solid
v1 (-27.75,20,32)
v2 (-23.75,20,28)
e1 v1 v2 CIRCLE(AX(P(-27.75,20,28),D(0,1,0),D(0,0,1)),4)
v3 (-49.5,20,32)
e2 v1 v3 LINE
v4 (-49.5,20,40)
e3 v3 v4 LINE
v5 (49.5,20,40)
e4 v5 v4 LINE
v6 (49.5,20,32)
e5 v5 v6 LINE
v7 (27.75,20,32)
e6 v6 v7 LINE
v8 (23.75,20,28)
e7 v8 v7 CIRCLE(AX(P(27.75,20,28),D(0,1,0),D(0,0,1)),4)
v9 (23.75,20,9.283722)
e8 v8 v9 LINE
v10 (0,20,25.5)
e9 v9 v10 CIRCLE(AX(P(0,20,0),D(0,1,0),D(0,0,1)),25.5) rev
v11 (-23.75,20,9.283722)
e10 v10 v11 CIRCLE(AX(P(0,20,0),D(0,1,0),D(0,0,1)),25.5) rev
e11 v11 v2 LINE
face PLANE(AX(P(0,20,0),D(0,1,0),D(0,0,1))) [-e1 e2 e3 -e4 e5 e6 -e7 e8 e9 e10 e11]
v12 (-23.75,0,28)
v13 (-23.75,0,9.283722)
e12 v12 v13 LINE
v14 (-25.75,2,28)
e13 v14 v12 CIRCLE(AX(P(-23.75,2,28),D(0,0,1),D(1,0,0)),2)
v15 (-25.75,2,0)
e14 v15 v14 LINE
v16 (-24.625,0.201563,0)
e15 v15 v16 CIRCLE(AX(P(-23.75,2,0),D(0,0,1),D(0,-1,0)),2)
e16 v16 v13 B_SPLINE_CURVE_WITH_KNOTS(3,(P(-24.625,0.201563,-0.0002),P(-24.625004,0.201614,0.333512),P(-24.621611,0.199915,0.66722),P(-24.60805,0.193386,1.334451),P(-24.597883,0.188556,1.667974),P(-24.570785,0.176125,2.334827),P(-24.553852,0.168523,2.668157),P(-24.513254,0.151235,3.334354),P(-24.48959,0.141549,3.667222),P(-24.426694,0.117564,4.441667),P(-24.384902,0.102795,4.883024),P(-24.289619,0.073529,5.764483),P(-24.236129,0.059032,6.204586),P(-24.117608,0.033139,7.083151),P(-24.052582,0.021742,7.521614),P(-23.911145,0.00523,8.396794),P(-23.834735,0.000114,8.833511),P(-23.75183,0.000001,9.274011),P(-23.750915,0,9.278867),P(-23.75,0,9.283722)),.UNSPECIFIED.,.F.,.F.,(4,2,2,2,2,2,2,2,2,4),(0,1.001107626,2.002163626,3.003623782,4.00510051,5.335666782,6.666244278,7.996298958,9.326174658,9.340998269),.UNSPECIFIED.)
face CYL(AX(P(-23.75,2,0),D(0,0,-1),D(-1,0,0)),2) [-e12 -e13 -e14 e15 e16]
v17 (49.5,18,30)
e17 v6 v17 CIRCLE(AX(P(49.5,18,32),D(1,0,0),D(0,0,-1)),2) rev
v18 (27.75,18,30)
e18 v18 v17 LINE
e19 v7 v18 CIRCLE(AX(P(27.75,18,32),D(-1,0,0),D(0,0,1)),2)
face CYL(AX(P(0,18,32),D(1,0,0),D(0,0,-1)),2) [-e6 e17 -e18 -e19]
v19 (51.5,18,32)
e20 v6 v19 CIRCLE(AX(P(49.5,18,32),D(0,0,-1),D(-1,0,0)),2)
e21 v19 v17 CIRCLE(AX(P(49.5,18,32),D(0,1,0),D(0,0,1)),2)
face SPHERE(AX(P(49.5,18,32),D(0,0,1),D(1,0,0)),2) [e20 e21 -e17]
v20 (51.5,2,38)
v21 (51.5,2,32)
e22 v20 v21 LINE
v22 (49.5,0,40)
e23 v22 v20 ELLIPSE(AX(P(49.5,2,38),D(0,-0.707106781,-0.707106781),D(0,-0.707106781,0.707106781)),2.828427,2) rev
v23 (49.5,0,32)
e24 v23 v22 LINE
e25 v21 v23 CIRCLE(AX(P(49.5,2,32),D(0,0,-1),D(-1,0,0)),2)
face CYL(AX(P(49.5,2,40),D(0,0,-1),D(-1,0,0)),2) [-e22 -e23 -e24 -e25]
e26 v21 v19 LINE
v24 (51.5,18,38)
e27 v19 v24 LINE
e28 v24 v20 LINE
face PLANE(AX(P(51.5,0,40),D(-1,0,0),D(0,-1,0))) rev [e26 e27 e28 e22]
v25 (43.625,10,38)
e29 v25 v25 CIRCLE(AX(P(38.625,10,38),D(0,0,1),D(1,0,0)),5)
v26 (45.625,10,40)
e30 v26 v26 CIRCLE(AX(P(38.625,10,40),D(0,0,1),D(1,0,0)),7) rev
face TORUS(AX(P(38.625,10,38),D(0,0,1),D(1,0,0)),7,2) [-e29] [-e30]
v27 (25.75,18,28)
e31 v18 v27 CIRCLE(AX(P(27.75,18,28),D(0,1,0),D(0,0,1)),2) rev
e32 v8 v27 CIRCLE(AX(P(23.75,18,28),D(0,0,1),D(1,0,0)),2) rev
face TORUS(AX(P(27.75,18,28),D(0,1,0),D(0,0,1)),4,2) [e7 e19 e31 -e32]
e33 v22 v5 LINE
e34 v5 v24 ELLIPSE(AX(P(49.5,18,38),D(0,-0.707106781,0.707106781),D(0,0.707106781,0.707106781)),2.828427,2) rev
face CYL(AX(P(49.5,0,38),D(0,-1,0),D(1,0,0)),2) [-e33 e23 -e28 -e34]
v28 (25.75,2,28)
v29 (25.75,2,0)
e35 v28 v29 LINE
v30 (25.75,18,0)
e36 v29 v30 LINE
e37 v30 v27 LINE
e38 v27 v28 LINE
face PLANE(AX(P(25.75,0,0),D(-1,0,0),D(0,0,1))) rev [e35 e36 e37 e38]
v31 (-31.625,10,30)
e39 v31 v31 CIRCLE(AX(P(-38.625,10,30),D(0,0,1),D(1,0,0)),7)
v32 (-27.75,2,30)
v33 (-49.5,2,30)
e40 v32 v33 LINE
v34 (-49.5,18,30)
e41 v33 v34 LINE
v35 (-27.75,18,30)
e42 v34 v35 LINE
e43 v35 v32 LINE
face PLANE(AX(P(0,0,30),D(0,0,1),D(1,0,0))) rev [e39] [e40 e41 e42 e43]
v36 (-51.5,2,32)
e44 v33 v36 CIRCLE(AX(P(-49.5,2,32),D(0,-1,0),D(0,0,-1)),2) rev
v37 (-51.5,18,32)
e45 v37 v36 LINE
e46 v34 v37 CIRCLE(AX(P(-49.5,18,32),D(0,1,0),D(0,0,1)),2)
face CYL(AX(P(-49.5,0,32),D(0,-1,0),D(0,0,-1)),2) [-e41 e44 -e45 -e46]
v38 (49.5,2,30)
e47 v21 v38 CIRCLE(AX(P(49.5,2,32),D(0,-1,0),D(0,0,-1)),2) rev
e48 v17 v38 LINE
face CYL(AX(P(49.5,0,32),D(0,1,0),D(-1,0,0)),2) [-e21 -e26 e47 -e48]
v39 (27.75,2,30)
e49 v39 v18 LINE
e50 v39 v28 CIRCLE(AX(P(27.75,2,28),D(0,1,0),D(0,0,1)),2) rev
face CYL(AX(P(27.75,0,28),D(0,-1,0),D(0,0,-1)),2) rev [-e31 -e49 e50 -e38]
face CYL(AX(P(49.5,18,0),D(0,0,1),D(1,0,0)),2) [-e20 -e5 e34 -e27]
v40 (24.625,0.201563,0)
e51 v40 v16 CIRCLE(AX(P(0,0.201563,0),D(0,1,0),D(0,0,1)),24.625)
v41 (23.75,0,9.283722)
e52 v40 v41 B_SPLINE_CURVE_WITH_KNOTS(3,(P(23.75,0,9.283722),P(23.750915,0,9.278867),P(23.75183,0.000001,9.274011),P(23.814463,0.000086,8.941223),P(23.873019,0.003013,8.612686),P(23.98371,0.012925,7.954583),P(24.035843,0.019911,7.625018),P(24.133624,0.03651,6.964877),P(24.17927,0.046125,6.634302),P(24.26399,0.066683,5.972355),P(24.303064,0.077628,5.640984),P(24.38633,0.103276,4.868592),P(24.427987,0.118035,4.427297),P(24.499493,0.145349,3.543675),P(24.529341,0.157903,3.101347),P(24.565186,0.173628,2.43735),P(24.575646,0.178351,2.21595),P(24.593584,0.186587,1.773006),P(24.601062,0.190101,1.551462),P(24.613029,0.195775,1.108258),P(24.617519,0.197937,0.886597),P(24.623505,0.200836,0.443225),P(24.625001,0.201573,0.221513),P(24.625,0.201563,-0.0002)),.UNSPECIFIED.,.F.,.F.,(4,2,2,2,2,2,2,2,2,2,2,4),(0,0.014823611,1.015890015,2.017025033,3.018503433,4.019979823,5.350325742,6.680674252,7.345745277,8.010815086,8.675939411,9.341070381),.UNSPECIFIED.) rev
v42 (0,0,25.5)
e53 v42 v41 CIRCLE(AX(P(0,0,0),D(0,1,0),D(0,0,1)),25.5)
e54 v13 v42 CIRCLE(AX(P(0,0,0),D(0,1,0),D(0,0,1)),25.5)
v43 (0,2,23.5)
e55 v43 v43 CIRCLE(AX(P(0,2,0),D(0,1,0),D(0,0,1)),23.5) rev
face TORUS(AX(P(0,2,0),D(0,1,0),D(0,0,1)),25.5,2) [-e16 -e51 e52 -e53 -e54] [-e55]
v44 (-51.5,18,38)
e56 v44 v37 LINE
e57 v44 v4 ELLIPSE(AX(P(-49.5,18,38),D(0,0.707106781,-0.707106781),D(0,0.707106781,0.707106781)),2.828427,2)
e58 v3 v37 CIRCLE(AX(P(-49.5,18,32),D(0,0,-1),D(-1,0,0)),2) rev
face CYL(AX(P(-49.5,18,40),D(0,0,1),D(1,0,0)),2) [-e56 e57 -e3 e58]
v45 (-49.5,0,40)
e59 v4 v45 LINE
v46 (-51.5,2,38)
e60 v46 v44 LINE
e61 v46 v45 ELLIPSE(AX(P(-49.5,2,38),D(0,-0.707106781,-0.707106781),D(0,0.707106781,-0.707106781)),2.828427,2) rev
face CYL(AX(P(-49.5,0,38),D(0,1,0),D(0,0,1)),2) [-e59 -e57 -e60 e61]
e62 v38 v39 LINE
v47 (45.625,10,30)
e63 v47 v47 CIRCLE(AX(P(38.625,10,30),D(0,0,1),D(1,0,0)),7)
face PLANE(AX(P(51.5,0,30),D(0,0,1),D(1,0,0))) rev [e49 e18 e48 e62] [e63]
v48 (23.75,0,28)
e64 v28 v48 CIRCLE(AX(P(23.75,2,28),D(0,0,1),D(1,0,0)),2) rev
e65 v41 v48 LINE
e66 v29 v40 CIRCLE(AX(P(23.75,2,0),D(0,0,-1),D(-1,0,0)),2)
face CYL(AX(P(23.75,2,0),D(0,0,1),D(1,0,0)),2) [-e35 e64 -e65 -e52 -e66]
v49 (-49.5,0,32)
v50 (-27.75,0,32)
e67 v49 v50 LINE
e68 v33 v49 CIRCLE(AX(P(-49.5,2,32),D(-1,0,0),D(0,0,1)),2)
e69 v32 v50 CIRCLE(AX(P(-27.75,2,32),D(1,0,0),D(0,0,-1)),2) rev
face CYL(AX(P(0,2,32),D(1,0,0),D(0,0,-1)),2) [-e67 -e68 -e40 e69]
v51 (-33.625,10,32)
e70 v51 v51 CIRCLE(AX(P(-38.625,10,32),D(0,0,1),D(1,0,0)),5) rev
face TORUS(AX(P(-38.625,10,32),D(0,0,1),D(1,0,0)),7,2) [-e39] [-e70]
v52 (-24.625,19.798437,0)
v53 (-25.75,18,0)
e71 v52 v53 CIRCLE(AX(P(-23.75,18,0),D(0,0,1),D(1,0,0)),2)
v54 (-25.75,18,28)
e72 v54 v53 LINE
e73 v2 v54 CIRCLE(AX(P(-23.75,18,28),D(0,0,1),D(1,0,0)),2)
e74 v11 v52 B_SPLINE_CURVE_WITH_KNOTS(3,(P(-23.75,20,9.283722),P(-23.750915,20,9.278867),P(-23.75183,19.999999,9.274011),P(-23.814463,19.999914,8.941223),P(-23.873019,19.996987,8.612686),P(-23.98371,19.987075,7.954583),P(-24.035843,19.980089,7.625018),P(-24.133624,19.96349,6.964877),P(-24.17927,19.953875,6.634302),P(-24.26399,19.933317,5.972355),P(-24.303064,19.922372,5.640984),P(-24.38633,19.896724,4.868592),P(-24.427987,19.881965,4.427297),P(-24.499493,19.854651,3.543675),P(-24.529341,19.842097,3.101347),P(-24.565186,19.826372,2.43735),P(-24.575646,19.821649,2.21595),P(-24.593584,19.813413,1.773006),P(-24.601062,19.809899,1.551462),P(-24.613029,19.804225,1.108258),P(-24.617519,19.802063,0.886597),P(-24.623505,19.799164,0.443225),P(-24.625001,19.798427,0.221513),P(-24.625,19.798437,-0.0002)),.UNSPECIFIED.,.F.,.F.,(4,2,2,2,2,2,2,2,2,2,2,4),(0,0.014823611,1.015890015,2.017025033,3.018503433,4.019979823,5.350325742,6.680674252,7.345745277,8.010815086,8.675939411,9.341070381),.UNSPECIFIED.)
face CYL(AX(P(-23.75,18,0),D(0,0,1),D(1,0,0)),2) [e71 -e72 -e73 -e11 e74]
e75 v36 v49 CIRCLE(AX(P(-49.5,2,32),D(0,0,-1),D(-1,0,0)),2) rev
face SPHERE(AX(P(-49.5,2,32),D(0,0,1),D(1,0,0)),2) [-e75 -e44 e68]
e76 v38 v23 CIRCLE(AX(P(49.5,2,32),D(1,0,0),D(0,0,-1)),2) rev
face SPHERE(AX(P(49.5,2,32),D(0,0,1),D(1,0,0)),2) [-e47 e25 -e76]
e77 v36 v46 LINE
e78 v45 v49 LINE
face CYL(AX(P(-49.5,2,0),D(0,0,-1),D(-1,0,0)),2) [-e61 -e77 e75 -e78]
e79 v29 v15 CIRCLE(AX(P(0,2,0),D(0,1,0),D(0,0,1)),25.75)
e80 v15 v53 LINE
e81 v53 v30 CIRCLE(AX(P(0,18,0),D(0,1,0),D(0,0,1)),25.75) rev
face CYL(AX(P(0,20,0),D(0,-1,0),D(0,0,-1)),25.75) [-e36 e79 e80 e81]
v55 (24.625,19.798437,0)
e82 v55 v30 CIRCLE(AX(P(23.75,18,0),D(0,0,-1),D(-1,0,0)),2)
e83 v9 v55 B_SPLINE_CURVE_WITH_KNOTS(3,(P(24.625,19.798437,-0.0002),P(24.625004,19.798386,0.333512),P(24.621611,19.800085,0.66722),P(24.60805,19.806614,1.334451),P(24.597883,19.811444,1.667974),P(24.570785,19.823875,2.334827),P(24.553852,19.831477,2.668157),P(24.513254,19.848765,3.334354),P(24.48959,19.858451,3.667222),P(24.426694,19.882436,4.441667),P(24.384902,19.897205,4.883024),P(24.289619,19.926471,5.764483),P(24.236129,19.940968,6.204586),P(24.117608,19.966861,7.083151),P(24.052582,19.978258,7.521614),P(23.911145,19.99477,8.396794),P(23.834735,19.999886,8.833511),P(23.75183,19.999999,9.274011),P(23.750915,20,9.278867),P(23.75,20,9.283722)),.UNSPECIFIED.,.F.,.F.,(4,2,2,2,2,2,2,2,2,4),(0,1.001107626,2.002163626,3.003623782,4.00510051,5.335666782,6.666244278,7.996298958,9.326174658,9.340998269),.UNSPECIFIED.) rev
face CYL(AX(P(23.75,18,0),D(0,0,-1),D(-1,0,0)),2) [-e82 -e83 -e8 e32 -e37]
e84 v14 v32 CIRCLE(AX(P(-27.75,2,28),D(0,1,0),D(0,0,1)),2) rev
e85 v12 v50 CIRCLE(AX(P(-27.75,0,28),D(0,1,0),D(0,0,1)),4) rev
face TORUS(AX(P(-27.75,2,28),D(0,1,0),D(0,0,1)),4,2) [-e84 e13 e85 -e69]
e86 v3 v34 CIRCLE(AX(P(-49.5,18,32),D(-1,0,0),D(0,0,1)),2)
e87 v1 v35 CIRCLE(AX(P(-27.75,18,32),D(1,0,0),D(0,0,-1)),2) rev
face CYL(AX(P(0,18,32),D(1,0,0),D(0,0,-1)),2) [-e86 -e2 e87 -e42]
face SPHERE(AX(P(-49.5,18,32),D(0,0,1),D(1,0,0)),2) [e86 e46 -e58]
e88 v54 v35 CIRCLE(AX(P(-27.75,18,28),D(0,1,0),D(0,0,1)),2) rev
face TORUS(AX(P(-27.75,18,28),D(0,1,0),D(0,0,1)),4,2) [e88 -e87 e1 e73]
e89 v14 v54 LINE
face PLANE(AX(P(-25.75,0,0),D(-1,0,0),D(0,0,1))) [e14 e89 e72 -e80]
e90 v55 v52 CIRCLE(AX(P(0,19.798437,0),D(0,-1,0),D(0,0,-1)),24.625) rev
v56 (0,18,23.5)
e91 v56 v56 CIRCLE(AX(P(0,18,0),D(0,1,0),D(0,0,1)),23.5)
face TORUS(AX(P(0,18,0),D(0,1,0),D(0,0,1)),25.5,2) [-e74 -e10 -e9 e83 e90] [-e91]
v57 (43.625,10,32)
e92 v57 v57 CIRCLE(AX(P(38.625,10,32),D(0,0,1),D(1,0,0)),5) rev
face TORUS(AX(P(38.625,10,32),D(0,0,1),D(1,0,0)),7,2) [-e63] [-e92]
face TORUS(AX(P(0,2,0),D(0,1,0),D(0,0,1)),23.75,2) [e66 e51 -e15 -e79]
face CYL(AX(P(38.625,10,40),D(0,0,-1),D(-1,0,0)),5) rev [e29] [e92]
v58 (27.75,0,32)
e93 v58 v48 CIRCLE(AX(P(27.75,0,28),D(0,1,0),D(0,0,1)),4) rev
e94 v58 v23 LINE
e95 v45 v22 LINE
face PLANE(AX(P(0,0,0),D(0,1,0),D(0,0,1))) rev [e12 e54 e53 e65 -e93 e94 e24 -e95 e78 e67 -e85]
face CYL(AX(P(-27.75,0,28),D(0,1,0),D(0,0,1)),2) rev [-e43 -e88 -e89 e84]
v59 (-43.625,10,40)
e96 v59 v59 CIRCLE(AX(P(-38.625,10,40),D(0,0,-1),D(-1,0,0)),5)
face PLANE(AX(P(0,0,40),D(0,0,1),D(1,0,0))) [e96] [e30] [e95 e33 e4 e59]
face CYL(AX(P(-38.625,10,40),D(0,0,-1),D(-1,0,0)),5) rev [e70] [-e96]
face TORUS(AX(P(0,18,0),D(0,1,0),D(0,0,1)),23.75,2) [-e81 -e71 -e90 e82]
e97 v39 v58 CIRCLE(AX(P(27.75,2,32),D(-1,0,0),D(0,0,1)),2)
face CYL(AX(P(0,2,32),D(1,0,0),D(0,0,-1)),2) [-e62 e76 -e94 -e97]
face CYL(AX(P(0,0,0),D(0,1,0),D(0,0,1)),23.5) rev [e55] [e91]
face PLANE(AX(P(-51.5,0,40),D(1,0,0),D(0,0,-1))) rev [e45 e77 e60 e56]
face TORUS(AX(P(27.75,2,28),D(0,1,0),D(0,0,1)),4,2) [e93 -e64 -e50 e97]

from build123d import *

# Parameters (mm, degrees)
SKETCH1_R           = 25.75
BOSS_EXTRUDE1_DEPTH = 20
SKETCH3_W           = 51.5
SKETCH3_H           = 30
BOSS_EXTRUDE2_DEPTH = 20
SKETCH2_R           = 23.5
CUT_EXTRUDE1_DEPTH  = 20
SKETCH6_W           = 51.5
SKETCH6_H           = 20
BOSS_EXTRUDE3_DEPTH = 10
LPATTERN1_COUNT     = 2
LPATTERN1_PITCH     = 51.5
SKETCH7_R           = 5
CUT_EXTRUDE2_DEPTH  = 10
LPATTERN2_COUNT     = 2
LPATTERN2_PITCH     = 77.25
FILLET3_R           = 2


with BuildPart() as part:
    # Sketch1 → Boss-Extrude1 (new body)
    with BuildSketch(Plane(origin=(0, 0, 0), x_dir=(1, 0, 0), z_dir=(0, 1, 0))):
        with Locations(Location((0, 0, 0), (0, 0, 270))):
            Circle(SKETCH1_R)
    extrude(amount=BOSS_EXTRUDE1_DEPTH)

    # Sketch3 → Boss-Extrude2 (add)
    with BuildSketch(Plane(origin=(0, 20, 0), x_dir=(1, 0, 0), z_dir=(0, 1, 0))):
        with Locations((0, -15)):
            Rectangle(SKETCH3_W, SKETCH3_H)
    extrude(amount=-BOSS_EXTRUDE2_DEPTH)

    # Sketch2 → Cut-Extrude1 (cut)
    with BuildSketch(Plane(origin=(0, 20, 0), x_dir=(1, 0, 0), z_dir=(0, 1, 0))):
        with Locations(Location((0, 0, 0), (0, 0, 270))):
            Circle(SKETCH2_R)
    extrude(amount=-CUT_EXTRUDE1_DEPTH, mode=Mode.SUBTRACT)

    # Sketch6 → Boss-Extrude3 (add)
    with BuildSketch(Plane.XY.offset(30)):
        with Locations((-25.75, 10)):
            Rectangle(SKETCH6_W, SKETCH6_H)
    boss_extrude3 = extrude(amount=BOSS_EXTRUDE3_DEPTH)

    # LPattern1: Boss-Extrude3 ×2
    with Locations(*[(i * LPATTERN1_PITCH, 0, 0) for i in range(1, LPATTERN1_COUNT)]):
        add(boss_extrude3)

    # Sketch7 → Cut-Extrude2 (cut)
    with BuildSketch(Plane(origin=(0, 0, 30), x_dir=(-1, 0, 0), z_dir=(0, 0, -1))):
        with Locations((-38.625, 10)):
            Circle(SKETCH7_R)
    cut_extrude2 = extrude(amount=-CUT_EXTRUDE2_DEPTH, mode=Mode.SUBTRACT)

    # LPattern2: Cut-Extrude2 ×2
    with Locations(*[(-i * LPATTERN2_PITCH, 0, 0) for i in range(1, LPATTERN2_COUNT)]):
        add(cut_extrude2, mode=Mode.SUBTRACT)

    # Fillet3
    # the kernel refuses this fillet: 2 mm, written as the material it adds along each edge
    with BuildSketch(Plane(origin=(25.75, 20, 30), x_dir=(1, 0, 0), z_dir=(0, -1, 0)), Plane(origin=(-25.75, 20, 30), x_dir=(0, 0, -1), z_dir=(0, -1, 0))) as fillet3_piece_1:
        with BuildLine():
            CenterArc((FILLET3_R, -FILLET3_R), FILLET3_R, 90, 90)
            Line((0, -FILLET3_R), (0, 0))
            Line((0, 0), (FILLET3_R, 0))
        make_face()
    extrude(amount=20)
    # the kernel refuses this fillet: 2 mm, written as the material it takes off along each edge
    with BuildSketch(Plane(origin=(0, 0, 0), x_dir=(0, 0, 1), z_dir=(-1, 0, 0))) as fillet3_2_piece_1:
        with BuildLine():
            CenterArc((23.5 + FILLET3_R, FILLET3_R), FILLET3_R, 180, 90)
            Line((23.5, FILLET3_R), (23.5, 0))
            Line((23.5, 0), (23.5 + FILLET3_R, 0))
        make_face()
    revolve(axis=Axis((0, 0, 0), (0, 1, 0)), mode=Mode.SUBTRACT)
    with BuildSketch(Plane(origin=(0, 20, 0), x_dir=(0, 0, 1), z_dir=(-1, 0, 0))) as fillet3_2_piece_2:
        with BuildLine():
            CenterArc((23.5 + FILLET3_R, -FILLET3_R), FILLET3_R, 90, 90)
            Line((23.5 + FILLET3_R, 0), (23.5, 0))
            Line((23.5, 0), (23.5, -FILLET3_R))
        make_face()
    revolve(axis=Axis((0, 20, 0), (0, 1, 0)), mode=Mode.SUBTRACT)
    with BuildSketch(Plane(origin=(-51.5, -5, 30), x_dir=(1, 0, 0), z_dir=(0, 1, 0)), Plane(origin=(-51.5, -5, 40), x_dir=(0, 0, -1), z_dir=(0, 1, 0))) as fillet3_2_piece_3:
        with BuildLine():
            CenterArc((FILLET3_R, -FILLET3_R), FILLET3_R, 90, 90)
            Line((0, -FILLET3_R), (0, 0))
            Line((0, 0), (FILLET3_R, 0))
        make_face()
    extrude(amount=30, mode=Mode.SUBTRACT)
    with BuildSketch(Plane(origin=(-51.5, 20, 25), x_dir=(0, -1, 0), z_dir=(0, 0, 1)), Plane(origin=(-51.5, 0, 25), x_dir=(1, 0, 0), z_dir=(0, 0, 1))) as fillet3_2_piece_4:
        with BuildLine():
            CenterArc((FILLET3_R, FILLET3_R), FILLET3_R, 180, 90)
            Line((0, FILLET3_R), (0, 0))
            Line((0, 0), (FILLET3_R, 0))
        make_face()
    extrude(amount=20, mode=Mode.SUBTRACT)
    with BuildSketch(Plane(origin=(51.5, 25, 30), x_dir=(0, 0, 1), z_dir=(0, -1, 0)), Plane(origin=(51.5, 25, 40), x_dir=(-1, 0, 0), z_dir=(0, -1, 0))) as fillet3_2_piece_5:
        with BuildLine():
            CenterArc((FILLET3_R, FILLET3_R), FILLET3_R, 180, 90)
            Line((0, FILLET3_R), (0, 0))
            Line((0, 0), (FILLET3_R, 0))
        make_face()
    extrude(amount=30, mode=Mode.SUBTRACT)
    with BuildSketch(Plane(origin=(51.5, 0, 25), x_dir=(-1, 0, 0), z_dir=(0, 0, 1)), Plane(origin=(51.5, 20, 25), x_dir=(0, -1, 0), z_dir=(0, 0, 1))) as fillet3_2_piece_6:
        with BuildLine():
            CenterArc((FILLET3_R, -FILLET3_R), FILLET3_R, 90, 90)
            Line((0, -FILLET3_R), (0, 0))
            Line((0, 0), (FILLET3_R, 0))
        make_face()
    extrude(amount=20, mode=Mode.SUBTRACT)
    with BuildSketch(Plane(origin=(38.625, 10, 40), x_dir=(-1, 0, 0), z_dir=(0, -1, 0))) as fillet3_2_piece_7:
        with BuildLine():
            CenterArc((5 + FILLET3_R, FILLET3_R), FILLET3_R, 180, 90)
            Line((5, FILLET3_R), (5, 0))
            Line((5, 0), (5 + FILLET3_R, 0))
        make_face()
    revolve(axis=Axis((38.625, 10, 40), (0, 0, -1)), mode=Mode.SUBTRACT)
    with BuildSketch(Plane(origin=(38.625, 10, 30), x_dir=(-1, 0, 0), z_dir=(0, -1, 0))) as fillet3_2_piece_8:
        with BuildLine():
            CenterArc((5 + FILLET3_R, -FILLET3_R), FILLET3_R, 90, 90)
            Line((5, -FILLET3_R), (5, 0))
            Line((5, 0), (5 + FILLET3_R, 0))
        make_face()
    revolve(axis=Axis((38.625, 10, 30), (0, 0, -1)), mode=Mode.SUBTRACT)
    with BuildSketch(Plane(origin=(-38.625, 10, 30), x_dir=(-1, 0, 0), z_dir=(0, -1, 0))) as fillet3_2_piece_9:
        with BuildLine():
            CenterArc((5 + FILLET3_R, -FILLET3_R), FILLET3_R, 90, 90)
            Line((5, -FILLET3_R), (5, 0))
            Line((5, 0), (5 + FILLET3_R, 0))
        make_face()
    revolve(axis=Axis((-38.625, 10, 30), (0, 0, -1)), mode=Mode.SUBTRACT)
    # the kernel refuses this fillet: 2 mm, written as the material it takes off along each edge
    with BuildSketch(Plane(origin=(49.5, 2, 32), x_dir=(0, 0, -1), z_dir=(0, -1, 0))) as fillet3_3_piece_1_section:
        Polygon((0, 0), (FILLET3_R, 0), (FILLET3_R, FILLET3_R), (0, FILLET3_R), align=None)
    fillet3_3_piece_1 = extrude(amount=FILLET3_R, mode=Mode.PRIVATE)
    fillet3_3_piece_1 = fillet3_3_piece_1 - Plane(origin=(49.5, 2, 32), x_dir=(-0.7071067811865475, 0, 0.7071067811865475), z_dir=(0, -1, 0)) * Sphere(FILLET3_R, mode=Mode.PRIVATE)
    add(fillet3_3_piece_1, mode=Mode.SUBTRACT)
    with BuildSketch(Plane(origin=(49.5, 18, 32), x_dir=(0, 1, 0), z_dir=(0, 0, -1))) as fillet3_3_piece_2_section:
        Polygon((0, 0), (FILLET3_R, 0), (FILLET3_R, FILLET3_R), (0, FILLET3_R), align=None)
    fillet3_3_piece_2 = extrude(amount=FILLET3_R, mode=Mode.PRIVATE)
    fillet3_3_piece_2 = fillet3_3_piece_2 - Plane(origin=(49.5, 18, 32), x_dir=(-0.7071067811865475, -0.7071067811865475, 0), z_dir=(0, 0, -1)) * Sphere(FILLET3_R, mode=Mode.PRIVATE)
    add(fillet3_3_piece_2, mode=Mode.SUBTRACT)
    with BuildSketch(Plane(origin=(-49.5, 2, 32), x_dir=(0, 0, -1), z_dir=(0, -1, 0))) as fillet3_3_piece_3_section:
        Polygon((0, 0), (FILLET3_R, 0), (FILLET3_R, -FILLET3_R), (0, -FILLET3_R), align=None)
    fillet3_3_piece_3 = extrude(amount=FILLET3_R, mode=Mode.PRIVATE)
    fillet3_3_piece_3 = fillet3_3_piece_3 - Plane(origin=(-49.5, 2, 32), x_dir=(0.7071067811865475, 0, 0.7071067811865475), z_dir=(0, -1, 0)) * Sphere(FILLET3_R, mode=Mode.PRIVATE)
    add(fillet3_3_piece_3, mode=Mode.SUBTRACT)
    with BuildSketch(Plane(origin=(-49.5, 18, 32), x_dir=(0, 1, 0), z_dir=(0, 0, -1))) as fillet3_3_piece_4_section:
        Polygon((0, 0), (FILLET3_R, 0), (FILLET3_R, -FILLET3_R), (0, -FILLET3_R), align=None)
    fillet3_3_piece_4 = extrude(amount=FILLET3_R, mode=Mode.PRIVATE)
    fillet3_3_piece_4 = fillet3_3_piece_4 - Plane(origin=(-49.5, 18, 32), x_dir=(0.7071067811865475, -0.7071067811865475, 0), z_dir=(0, 0, -1)) * Sphere(FILLET3_R, mode=Mode.PRIVATE)
    add(fillet3_3_piece_4, mode=Mode.SUBTRACT)
    with BuildSketch(Plane(origin=(25.75, 0, 0), x_dir=(-1, 0, 0), z_dir=(0, 0, 1)), Plane(origin=(-25.75, 20, 28), x_dir=(0, -1, 0), z_dir=(0, 0, -1)), Plane(origin=(25.75, 20, 0), x_dir=(0, -1, 0), z_dir=(0, 0, 1)), Plane(origin=(-25.75, 0, 28), x_dir=(1, 0, 0), z_dir=(0, 0, -1))) as fillet3_3_piece_5:
        with BuildLine():
            CenterArc((FILLET3_R, -FILLET3_R), FILLET3_R, 90, 90)
            Line((0, -FILLET3_R), (0, 0))
            Line((0, 0), (FILLET3_R, 0))
        make_face()
    extrude(amount=28, mode=Mode.SUBTRACT)
    with BuildSketch(Plane(origin=(0, 0, 0), x_dir=(1, 0, 0), z_dir=(0, 0, 1))) as fillet3_3_piece_6:
        with BuildLine():
            CenterArc((25.75 - FILLET3_R, FILLET3_R), FILLET3_R, 270, 90)
            Line((25.75, FILLET3_R), (25.75, 0))
            Line((25.75, 0), (25.75 - FILLET3_R, 0))
        make_face()
    revolve(axis=Axis((0, 0, 0), (0, 1, 0)), revolution_arc=180, mode=Mode.SUBTRACT)
    with BuildSketch(Plane(origin=(-49.5, 20, 30), x_dir=(0, -1, 0), z_dir=(1, 0, 0)), Plane(origin=(27.75, 20, 30), x_dir=(0, -1, 0), z_dir=(1, 0, 0))) as fillet3_3_piece_7:
        with BuildLine():
            CenterArc((FILLET3_R, -FILLET3_R), FILLET3_R, 90, 90)
            Line((0, -FILLET3_R), (0, 0))
            Line((0, 0), (FILLET3_R, 0))
        make_face()
    extrude(amount=21.75, mode=Mode.SUBTRACT)
    with BuildSketch(Plane(origin=(-27.75, 0, 30), x_dir=(0, 0, 1), z_dir=(-1, 0, 0)), Plane(origin=(49.5, 0, 30), x_dir=(0, 0, 1), z_dir=(-1, 0, 0))) as fillet3_3_piece_8:
        with BuildLine():
            CenterArc((FILLET3_R, FILLET3_R), FILLET3_R, 180, 90)
            Line((0, FILLET3_R), (0, 0))
            Line((0, 0), (FILLET3_R, 0))
        make_face()
    extrude(amount=21.75, mode=Mode.SUBTRACT)
    with BuildSketch(Plane(origin=(0, 20, 0), x_dir=(1, 0, 0), z_dir=(0, 0, 1))) as fillet3_3_piece_9:
        with BuildLine():
            CenterArc((25.75 - FILLET3_R, -FILLET3_R), FILLET3_R, 0, 90)
            Line((25.75 - FILLET3_R, 0), (25.75, 0))
            Line((25.75, 0), (25.75, -FILLET3_R))
        make_face()
    revolve(axis=Axis((0, 20, 0), (0, 1, 0)), revolution_arc=180, mode=Mode.SUBTRACT)
    with BuildSketch(Plane(origin=(-27.75, 0, 28), x_dir=(1, 0, 0), z_dir=(0, 0, -1))) as fillet3_3_piece_10:
        with BuildLine():
            CenterArc((2 + FILLET3_R, -FILLET3_R), FILLET3_R, 90, 90)
            Line((2, -FILLET3_R), (2, 0))
            Line((2, 0), (2 + FILLET3_R, 0))
        make_face()
    revolve(axis=Axis((-27.75, 0, 28), (0, -1, 0)), revolution_arc=90, mode=Mode.SUBTRACT)
    with BuildSketch(Plane(origin=(27.75, 20, 28), x_dir=(0, 0, 1), z_dir=(1, 0, 0))) as fillet3_3_piece_11:
        with BuildLine():
            CenterArc((2 + FILLET3_R, FILLET3_R), FILLET3_R, 180, 90)
            Line((2 + FILLET3_R, 0), (2, 0))
            Line((2, 0), (2, FILLET3_R))
        make_face()
    revolve(axis=Axis((27.75, 20, 28), (0, -1, 0)), revolution_arc=90, mode=Mode.SUBTRACT)
    with BuildSketch(Plane(origin=(27.75, 0, 28), x_dir=(0, 0, 1), z_dir=(1, 0, 0))) as fillet3_3_piece_12:
        with BuildLine():
            CenterArc((2 + FILLET3_R, -FILLET3_R), FILLET3_R, 90, 90)
            Line((2, -FILLET3_R), (2, 0))
            Line((2, 0), (2 + FILLET3_R, 0))
        make_face()
    revolve(axis=Axis((27.75, 0, 28), (0, -1, 0)), revolution_arc=90, mode=Mode.SUBTRACT)
    with BuildSketch(Plane(origin=(-27.75, 20, 28), x_dir=(1, 0, 0), z_dir=(0, 0, -1))) as fillet3_3_piece_13:
        with BuildLine():
            CenterArc((2 + FILLET3_R, FILLET3_R), FILLET3_R, 180, 90)
            Line((2 + FILLET3_R, 0), (2, 0))
            Line((2, 0), (2, FILLET3_R))
        make_face()
    revolve(axis=Axis((-27.75, 20, 28), (0, -1, 0)), revolution_arc=90, mode=Mode.SUBTRACT)


solid = part.part
